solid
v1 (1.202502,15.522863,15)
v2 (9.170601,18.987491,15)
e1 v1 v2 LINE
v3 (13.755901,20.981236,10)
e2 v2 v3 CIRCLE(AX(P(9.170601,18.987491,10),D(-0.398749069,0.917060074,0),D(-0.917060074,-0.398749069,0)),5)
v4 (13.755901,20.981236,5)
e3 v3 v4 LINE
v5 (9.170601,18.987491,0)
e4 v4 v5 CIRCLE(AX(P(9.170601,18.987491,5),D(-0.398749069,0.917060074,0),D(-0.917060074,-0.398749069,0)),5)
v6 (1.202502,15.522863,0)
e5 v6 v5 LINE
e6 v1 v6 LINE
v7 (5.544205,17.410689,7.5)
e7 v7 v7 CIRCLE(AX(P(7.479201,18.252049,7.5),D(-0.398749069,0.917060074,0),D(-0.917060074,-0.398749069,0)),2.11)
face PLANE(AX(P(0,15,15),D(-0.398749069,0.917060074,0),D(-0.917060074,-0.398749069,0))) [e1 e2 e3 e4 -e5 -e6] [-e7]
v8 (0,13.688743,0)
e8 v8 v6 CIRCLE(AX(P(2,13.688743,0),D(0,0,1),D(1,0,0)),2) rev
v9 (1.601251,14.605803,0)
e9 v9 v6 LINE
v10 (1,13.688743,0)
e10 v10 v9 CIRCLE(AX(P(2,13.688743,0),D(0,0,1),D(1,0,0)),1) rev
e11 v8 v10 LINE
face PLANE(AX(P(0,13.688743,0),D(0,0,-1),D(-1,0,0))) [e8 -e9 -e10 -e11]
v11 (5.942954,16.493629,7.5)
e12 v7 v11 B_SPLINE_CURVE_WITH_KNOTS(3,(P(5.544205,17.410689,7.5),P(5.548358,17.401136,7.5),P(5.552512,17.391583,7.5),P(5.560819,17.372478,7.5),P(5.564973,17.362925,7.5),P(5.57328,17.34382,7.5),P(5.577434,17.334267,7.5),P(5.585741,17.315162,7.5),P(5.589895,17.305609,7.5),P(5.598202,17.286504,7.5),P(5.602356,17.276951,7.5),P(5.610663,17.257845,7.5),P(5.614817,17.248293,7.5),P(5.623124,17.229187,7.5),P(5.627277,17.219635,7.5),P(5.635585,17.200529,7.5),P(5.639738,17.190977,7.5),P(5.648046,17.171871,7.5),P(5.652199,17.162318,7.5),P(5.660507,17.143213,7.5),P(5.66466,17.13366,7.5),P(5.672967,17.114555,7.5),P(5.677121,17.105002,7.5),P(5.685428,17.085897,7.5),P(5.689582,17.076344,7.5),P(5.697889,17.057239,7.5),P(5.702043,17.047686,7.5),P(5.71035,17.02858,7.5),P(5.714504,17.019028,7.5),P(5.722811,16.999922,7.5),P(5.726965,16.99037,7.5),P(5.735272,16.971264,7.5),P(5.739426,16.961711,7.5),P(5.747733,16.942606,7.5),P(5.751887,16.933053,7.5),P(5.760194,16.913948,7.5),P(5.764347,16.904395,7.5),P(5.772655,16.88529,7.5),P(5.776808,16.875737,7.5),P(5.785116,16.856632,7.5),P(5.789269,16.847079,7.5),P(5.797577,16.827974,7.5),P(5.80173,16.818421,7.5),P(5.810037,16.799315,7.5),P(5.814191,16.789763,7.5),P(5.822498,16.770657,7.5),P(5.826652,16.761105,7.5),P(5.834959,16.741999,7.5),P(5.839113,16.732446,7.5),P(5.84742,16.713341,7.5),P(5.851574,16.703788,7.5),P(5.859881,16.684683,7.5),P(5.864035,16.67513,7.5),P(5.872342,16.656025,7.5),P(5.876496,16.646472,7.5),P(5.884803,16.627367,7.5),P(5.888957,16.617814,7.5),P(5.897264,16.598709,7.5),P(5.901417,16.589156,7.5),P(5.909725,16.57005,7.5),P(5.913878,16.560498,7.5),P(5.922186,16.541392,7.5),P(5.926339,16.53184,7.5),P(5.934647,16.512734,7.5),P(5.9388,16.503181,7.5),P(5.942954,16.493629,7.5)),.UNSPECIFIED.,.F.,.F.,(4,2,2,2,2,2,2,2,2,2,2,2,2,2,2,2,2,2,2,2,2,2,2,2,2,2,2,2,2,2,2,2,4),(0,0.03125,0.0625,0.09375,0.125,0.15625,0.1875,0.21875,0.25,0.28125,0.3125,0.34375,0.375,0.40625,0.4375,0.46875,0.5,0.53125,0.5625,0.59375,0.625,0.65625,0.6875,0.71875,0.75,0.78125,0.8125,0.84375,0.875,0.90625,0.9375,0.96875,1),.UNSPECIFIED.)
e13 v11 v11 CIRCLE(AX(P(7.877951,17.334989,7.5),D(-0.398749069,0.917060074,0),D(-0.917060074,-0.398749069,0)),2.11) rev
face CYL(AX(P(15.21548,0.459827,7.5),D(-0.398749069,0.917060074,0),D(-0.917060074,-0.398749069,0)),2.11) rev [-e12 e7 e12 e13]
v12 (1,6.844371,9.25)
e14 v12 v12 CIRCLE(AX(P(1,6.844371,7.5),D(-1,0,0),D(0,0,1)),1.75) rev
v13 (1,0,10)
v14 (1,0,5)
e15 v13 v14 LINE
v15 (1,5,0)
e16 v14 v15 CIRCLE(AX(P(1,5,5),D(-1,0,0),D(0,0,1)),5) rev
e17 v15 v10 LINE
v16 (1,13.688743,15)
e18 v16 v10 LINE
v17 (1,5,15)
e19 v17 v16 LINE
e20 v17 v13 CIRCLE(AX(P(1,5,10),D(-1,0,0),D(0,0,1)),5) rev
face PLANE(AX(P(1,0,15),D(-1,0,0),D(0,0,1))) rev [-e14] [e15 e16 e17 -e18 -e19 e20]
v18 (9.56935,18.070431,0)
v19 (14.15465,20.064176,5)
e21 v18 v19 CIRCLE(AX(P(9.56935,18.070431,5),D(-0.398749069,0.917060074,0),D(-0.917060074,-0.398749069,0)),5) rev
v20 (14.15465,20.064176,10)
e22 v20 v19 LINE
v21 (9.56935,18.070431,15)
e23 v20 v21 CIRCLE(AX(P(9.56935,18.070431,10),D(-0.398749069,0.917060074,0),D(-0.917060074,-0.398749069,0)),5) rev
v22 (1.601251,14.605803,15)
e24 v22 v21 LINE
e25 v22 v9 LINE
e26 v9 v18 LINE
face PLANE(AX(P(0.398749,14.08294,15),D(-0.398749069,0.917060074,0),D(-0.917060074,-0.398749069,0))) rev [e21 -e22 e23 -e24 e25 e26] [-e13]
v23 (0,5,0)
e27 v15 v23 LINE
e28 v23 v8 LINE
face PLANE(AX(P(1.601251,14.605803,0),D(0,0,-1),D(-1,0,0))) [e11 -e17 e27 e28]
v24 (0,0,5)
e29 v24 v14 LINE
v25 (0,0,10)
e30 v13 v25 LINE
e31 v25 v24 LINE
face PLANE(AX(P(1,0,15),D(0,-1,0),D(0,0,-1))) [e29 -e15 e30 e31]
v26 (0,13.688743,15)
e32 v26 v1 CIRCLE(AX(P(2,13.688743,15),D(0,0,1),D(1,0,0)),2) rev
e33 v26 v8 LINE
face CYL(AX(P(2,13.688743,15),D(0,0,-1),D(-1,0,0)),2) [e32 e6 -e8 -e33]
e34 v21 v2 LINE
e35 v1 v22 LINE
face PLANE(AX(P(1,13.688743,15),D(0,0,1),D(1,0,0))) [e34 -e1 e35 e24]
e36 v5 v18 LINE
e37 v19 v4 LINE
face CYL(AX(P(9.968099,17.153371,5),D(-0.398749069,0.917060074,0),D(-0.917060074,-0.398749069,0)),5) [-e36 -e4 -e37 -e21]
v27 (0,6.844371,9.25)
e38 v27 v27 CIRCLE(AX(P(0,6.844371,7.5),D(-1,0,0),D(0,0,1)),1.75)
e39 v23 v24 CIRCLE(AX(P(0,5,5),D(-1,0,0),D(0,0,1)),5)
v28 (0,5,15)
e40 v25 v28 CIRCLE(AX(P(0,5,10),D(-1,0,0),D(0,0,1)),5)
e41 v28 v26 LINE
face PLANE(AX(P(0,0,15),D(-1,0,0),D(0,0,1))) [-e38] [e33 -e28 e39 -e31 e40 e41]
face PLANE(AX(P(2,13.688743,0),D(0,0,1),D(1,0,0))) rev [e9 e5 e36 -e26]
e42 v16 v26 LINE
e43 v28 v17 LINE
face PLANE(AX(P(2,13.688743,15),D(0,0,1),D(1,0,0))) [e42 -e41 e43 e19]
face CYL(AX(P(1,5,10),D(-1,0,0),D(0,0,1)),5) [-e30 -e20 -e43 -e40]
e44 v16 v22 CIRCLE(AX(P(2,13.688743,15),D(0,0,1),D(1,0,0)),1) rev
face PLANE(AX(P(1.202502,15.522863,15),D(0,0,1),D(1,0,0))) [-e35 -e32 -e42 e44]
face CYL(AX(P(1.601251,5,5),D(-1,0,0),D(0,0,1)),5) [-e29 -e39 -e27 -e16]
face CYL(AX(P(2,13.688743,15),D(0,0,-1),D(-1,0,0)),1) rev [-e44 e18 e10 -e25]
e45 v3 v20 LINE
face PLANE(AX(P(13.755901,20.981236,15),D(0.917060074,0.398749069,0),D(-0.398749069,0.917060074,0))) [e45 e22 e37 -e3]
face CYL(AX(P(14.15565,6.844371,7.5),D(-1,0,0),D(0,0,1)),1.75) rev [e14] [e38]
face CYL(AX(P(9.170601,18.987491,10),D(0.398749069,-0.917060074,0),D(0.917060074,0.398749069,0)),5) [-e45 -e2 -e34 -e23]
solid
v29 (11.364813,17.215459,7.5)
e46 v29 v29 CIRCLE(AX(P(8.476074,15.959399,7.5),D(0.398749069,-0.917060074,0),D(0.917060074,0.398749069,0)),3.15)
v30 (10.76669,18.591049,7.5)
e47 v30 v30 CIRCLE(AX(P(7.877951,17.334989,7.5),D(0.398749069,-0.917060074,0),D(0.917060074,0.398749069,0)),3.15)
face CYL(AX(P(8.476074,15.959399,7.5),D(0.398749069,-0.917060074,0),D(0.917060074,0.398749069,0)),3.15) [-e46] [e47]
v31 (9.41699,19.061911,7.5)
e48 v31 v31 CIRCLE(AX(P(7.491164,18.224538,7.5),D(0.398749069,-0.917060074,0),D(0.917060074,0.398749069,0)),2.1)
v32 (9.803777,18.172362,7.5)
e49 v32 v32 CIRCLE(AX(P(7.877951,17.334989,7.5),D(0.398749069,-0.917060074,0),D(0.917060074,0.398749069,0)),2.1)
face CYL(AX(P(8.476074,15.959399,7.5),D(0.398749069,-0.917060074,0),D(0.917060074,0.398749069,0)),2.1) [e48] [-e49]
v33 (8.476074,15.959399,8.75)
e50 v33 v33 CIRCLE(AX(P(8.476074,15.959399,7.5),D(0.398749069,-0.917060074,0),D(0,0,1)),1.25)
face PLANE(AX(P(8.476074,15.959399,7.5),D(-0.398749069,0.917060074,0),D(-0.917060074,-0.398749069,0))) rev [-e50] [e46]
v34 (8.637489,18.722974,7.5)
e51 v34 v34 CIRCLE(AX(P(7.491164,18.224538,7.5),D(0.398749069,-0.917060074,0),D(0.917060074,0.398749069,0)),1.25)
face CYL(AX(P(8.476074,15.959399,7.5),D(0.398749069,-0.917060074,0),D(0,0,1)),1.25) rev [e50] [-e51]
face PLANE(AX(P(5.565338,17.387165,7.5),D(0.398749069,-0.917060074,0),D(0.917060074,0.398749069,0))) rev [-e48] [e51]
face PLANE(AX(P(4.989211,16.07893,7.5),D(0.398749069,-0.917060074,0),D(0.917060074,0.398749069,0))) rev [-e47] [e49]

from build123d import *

# Parameters (mm, degrees)
BRIDA_BASE1_DEPTH          = 15
CORTAR_EXTRUIR1_REACH      = 29.746
CROQUIS2_R                 = 2.11
CORTAR_EXTRUIR2_REACH      = 31.421
CROQUIS3_R                 = 1.75
REDONDEO1_R                = 5
S_M3_1_START               = 12.855392961
S_M3_1_OUTLINE_R           = 3.15
S_M3_1_OUTLINE_R_2         = 1.25
S_M3_1_DEPTH               = 1.5
S_M3_1_START_2             = 11.885392961
S_M3_1_2_OUTLINE_R         = 2.1
S_M3_1_2_OUTLINE_R_2       = 1.25
S_M3_1_2_DEPTH             = 0.97
S_LIDO_MOVER_COPIAR2_ANGLE = 156.5


with BuildPart() as part:
    # Brida base1: sheet metal written as solids
    # Croquis1 → Brida base1 (new body)
    with BuildSketch(Plane.XY):
        with BuildLine():
            Line((0, 0), (0, 13.688742542))
            ThreePointArc((0, 13.688742542), (0.327427688, 14.785329001), (1.202501862, 15.522862691))
            Line((1.202501862, 15.522862691), (13.755901116, 20.981236034))
            Line((13.755901116, 20.981236034), (14.154650185, 20.064175959))
            Line((14.154650185, 20.064175959), (1.601250931, 14.605802616))
            ThreePointArc((1.601250931, 14.605802616), (1.163713844, 14.237035771), (1, 13.688742542))
            Line((1, 13.688742542), (1, 0))
            Line((1, 0), (0, 0))
        make_face()
    extrude(amount=BRIDA_BASE1_DEPTH)

    # Croquis2 → Cortar-Extruir1 (cut, up to next)
    with BuildSketch(Plane(origin=(-5.485152762, 12.6149877, 0), x_dir=(0.917060074385125, 0.3987490689252439, 0), z_dir=(-0.3987490689252439, 0.917060074385125, 0)), mode=Mode.PRIVATE) as cortar_extruir1_sk1:
        with Locations(Location((14.136864763, -7.5, 0), (0, 0, 180))):
            Circle(CROQUIS2_R)
    cortar_extruir1_tool1 = extrude(cortar_extruir1_sk1.sketch, amount=-CORTAR_EXTRUIR1_REACH, mode=Mode.PRIVATE) & part.part
    add(cortar_extruir1_tool1.solids().sort_by_distance((7.479201, 18.252049, 7.5))[0], mode=Mode.SUBTRACT)

    # Croquis3 → Cortar-Extruir2 (cut, up to next)
    with BuildSketch(Plane.ZY, mode=Mode.PRIVATE) as cortar_extruir2_sk1:
        with Locations((7.5, 6.844371271)):
            Circle(CROQUIS3_R)
    cortar_extruir2_tool1 = extrude(cortar_extruir2_sk1.sketch, amount=-CORTAR_EXTRUIR2_REACH, mode=Mode.PRIVATE) & part.part
    add(cortar_extruir2_tool1.solids().sort_by_distance((0, 6.844371, 7.5))[0], mode=Mode.SUBTRACT)

    # Redondeo1
    redondeo1_edges = [part.edges().sort_by_distance(p)[0] for p in [
        (0.5, 0, 15),
        (13.95527565, 20.522705997, 15),
        (0.5, 0, 0),
        (13.95527565, 20.522705997, 0),
    ]]
    fillet(redondeo1_edges, radius=REDONDEO1_R)


with BuildPart() as body_2:
    # S-M3-1: read off the stored shape, not the designer's step
    # S-M3-1 outline → S-M3-1 (new body)
    with BuildSketch(Plane(origin=(0, 0, 0), x_dir=(1, 0, 0), z_dir=(0, 1, 0)).offset(S_M3_1_START)):
        with Locations((7.761578354, 3.940203324)):
            Circle(S_M3_1_OUTLINE_R)
        with Locations((7.761578354, 3.940203324)):
            Circle(S_M3_1_OUTLINE_R_2, mode=Mode.SUBTRACT)
    extrude(amount=S_M3_1_DEPTH)

    # S-M3-1 2 outline → S-M3-1 2 (add)
    with BuildSketch(Plane(origin=(0, 0, 0), x_dir=(1, 0, 0), z_dir=(0, 1, 0)).offset(S_M3_1_START_2)):
        with Locations((7.761578354, 3.940203324)):
            Circle(S_M3_1_2_OUTLINE_R)
        with Locations((7.761578354, 3.940203324)):
            Circle(S_M3_1_2_OUTLINE_R_2, mode=Mode.SUBTRACT)
    extrude(amount=S_M3_1_2_DEPTH)


with BuildPart() as body_2_1:
    # Sólido-Mover/Copiar2: read off the stored shape, not the designer's step
    # Sólido-Mover/Copiar2: moved
    add(body_2.part.moved(Location((-21.8984431, -25.6112941, 11.4402033))).rotate(Axis((0, 0, 0), (0, 0, -1)), S_LIDO_MOVER_COPIAR2_ANGLE))


solid = Compound([part.part, body_2_1.part])
